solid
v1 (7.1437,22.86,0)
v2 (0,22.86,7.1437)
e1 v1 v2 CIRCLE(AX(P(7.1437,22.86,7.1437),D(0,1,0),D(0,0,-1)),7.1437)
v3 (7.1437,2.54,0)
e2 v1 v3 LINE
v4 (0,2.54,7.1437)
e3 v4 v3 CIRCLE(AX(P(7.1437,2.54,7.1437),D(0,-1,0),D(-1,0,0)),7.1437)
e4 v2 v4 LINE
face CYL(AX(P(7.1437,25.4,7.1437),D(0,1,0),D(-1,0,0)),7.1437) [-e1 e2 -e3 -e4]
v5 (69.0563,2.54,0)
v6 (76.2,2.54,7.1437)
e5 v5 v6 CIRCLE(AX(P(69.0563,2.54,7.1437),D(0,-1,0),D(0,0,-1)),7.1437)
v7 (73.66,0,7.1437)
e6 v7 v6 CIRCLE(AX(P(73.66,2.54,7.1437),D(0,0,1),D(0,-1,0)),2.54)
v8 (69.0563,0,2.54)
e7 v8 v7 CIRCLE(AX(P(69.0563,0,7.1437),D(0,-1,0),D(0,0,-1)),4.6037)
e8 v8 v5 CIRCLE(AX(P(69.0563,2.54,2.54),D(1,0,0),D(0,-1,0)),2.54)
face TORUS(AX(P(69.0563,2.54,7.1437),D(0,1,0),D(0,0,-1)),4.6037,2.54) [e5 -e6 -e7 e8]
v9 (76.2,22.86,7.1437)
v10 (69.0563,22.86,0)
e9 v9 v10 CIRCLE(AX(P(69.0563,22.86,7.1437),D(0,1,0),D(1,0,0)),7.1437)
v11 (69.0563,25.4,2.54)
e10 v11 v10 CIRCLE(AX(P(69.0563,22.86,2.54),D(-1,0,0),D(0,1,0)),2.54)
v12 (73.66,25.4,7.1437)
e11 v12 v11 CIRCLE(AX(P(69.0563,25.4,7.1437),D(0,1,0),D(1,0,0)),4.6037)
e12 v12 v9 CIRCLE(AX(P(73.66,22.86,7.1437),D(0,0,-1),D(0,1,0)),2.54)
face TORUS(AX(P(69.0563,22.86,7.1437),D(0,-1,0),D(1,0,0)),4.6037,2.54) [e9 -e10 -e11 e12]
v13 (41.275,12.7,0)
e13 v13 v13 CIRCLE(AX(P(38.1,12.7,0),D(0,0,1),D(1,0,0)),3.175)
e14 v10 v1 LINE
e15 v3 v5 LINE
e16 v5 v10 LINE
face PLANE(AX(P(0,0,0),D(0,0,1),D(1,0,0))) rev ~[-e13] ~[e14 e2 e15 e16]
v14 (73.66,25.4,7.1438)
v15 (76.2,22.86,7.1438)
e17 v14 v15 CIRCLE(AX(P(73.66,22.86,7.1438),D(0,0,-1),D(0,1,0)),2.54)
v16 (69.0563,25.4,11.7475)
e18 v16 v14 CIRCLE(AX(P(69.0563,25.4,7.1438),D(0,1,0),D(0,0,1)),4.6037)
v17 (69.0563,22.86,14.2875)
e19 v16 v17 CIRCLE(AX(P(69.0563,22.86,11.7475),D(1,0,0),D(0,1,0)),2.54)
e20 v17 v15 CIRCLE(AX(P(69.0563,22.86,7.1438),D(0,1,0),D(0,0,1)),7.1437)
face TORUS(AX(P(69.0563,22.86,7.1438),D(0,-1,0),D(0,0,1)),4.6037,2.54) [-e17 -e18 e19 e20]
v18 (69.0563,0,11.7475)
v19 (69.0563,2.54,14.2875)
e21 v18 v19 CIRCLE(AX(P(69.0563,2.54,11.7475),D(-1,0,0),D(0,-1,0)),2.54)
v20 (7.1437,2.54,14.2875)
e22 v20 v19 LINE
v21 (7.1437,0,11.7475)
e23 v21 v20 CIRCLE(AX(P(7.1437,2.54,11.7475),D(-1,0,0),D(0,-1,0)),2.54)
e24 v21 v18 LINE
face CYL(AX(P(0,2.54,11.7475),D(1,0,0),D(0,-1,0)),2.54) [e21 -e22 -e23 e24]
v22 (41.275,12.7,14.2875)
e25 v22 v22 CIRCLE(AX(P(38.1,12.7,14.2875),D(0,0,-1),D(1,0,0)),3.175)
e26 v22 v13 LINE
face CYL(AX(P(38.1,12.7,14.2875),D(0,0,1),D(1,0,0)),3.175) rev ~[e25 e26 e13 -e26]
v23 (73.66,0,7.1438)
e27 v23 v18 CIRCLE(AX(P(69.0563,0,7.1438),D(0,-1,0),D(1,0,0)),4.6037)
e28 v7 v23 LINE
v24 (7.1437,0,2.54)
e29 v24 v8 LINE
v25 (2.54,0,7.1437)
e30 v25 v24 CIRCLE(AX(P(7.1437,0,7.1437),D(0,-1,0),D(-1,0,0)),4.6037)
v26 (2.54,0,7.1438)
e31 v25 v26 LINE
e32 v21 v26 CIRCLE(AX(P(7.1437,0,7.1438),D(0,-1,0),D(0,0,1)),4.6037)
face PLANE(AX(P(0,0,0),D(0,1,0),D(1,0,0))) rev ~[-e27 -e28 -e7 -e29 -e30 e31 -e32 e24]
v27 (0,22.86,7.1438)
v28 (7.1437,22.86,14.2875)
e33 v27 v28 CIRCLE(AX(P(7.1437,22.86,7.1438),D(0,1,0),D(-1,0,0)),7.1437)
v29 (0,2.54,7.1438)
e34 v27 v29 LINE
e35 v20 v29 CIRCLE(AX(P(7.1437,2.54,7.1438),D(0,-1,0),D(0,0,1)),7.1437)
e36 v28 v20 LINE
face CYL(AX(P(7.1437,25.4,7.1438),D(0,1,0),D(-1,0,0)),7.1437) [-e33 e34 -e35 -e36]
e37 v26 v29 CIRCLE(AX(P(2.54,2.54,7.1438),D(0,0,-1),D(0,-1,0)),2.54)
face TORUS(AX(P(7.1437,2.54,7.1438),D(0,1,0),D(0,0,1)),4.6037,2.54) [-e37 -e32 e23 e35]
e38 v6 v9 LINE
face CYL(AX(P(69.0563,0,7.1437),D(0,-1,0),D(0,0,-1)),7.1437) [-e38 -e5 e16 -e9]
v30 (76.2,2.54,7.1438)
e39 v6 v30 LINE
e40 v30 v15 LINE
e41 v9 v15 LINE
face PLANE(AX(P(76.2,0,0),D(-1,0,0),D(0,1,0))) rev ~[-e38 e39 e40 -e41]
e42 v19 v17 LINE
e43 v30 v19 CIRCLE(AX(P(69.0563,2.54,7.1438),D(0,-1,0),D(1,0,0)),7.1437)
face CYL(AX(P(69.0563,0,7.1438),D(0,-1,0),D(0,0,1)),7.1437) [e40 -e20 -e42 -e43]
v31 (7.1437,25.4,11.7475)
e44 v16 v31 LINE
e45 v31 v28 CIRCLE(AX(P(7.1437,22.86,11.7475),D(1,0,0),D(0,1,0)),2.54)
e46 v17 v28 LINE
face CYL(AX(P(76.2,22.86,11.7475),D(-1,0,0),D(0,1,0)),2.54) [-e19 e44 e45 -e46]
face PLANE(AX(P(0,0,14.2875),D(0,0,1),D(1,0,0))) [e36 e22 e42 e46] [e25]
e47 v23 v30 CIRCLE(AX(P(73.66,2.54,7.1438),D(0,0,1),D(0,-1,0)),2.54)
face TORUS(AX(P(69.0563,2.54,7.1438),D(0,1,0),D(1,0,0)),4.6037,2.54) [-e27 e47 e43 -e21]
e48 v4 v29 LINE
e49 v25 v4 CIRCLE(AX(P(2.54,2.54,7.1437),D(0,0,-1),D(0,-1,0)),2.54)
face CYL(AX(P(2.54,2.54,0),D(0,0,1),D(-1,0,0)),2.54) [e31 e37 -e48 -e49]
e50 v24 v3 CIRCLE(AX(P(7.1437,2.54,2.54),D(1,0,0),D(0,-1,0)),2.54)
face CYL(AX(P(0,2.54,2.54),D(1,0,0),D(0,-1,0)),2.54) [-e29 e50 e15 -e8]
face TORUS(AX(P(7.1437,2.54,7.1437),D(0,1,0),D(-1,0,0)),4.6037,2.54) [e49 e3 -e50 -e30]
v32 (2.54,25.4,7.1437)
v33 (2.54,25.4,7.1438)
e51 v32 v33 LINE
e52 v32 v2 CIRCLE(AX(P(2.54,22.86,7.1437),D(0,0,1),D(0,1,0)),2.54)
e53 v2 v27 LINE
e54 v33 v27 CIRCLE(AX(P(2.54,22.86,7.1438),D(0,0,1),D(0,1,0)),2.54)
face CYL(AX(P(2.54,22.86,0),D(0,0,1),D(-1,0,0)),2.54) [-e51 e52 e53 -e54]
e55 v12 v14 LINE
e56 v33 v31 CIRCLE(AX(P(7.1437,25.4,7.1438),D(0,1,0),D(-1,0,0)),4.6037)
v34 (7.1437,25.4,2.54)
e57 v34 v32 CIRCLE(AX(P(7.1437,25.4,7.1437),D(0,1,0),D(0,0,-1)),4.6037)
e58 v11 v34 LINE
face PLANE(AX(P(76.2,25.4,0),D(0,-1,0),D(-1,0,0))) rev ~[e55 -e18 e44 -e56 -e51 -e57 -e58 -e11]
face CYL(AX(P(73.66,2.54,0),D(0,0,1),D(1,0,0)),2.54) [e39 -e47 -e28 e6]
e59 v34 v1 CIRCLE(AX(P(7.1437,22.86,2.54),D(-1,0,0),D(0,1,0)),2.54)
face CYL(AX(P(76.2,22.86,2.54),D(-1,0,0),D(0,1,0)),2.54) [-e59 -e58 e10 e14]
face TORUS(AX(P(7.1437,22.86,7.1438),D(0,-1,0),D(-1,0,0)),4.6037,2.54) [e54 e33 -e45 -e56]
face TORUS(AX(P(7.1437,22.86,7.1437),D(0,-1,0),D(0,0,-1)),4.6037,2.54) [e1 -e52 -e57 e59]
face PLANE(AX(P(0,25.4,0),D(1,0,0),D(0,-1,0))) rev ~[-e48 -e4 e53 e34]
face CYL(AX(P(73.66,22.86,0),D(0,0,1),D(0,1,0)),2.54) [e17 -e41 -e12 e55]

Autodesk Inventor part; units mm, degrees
ref_plane "YZ Plane" through (0, 0, 0) normal (1, 0, 0) x (0, 1, 0)
ref_plane "XZ Plane" through (0, 0, 0) normal (0, 1, 0) x (-1, 0, 0)
ref_plane "XY Plane" through (0, 0, 0) normal (0, 0, 1) x (1, 0, 0)
sketch "Sketch1" plane through (0, 0, 0) normal (0, 0, 1) x (1, 0, 0)
  line L0 (0, 0) -> (76.2, 0)
  line L1 (76.2, 0) -> (76.2, 25.4)
  line L2 (76.2, 25.4) -> (0, 25.4)
  line L3 (0, 25.4) -> (0, 0)
  dimension "d0" = 76.2
  dimension "d1" = 25.4
extrude "Extrusion1" add sketch "Sketch1" along normal blind 14.2875
fillet "Fillet1" radius 2.54 8 edges at (38.1, 25.4, 14.2875) (38.1, 0, 14.2875) (76.2, 0, 7.1437) (76.2, 25.4, 7.1437) (0, 25.4, 7.1437) (0, 0, 7.1437) (38.1, 25.4, 0) (38.1, 0, 0)
sketch "Sketch2" plane through (0, 0, 14.2875) normal (0, 0, 1) x (1, 0, 0)
  line L0 (2.54, 2.54) -> (2.54, 22.86) projected
  line L1 (2.54, 12.7) -> (73.66, 12.7)
  line L2 (73.66, 22.86) -> (73.66, 2.54) projected
  circle A0 centre (38.1, 12.7) radius 3.175
  point P0 (0, 0)
  dimension "d5" = 6.35
extrude "Extrusion2" cut sketch "Sketch2" against normal blind 14.2875
thread "Thread1" size "1/4-20 UNC" class "2B" standard "ANSI Unified Screw Threads" full length
fillet "Fillet2" radius 7.1437 12 edges at (75.4561, 24.6561, 13.5436) (75.4561, 0.7439, 13.5436) (76.2, 12.7, 14.2875) (75.4561, 24.6561, 0.7439) (75.4561, 0.7439, 0.7439) (76.2, 12.7, 0) (0.7439, 0.7439, 13.5436) (0.7439, 24.6561, 13.5436) (0, 12.7, 14.2875) (0.7439, 0.7439, 0.7439) (0.7439, 24.6561, 0.7439) (0, 12.7, 0)
properties part number "bolt" material "Zinc"
